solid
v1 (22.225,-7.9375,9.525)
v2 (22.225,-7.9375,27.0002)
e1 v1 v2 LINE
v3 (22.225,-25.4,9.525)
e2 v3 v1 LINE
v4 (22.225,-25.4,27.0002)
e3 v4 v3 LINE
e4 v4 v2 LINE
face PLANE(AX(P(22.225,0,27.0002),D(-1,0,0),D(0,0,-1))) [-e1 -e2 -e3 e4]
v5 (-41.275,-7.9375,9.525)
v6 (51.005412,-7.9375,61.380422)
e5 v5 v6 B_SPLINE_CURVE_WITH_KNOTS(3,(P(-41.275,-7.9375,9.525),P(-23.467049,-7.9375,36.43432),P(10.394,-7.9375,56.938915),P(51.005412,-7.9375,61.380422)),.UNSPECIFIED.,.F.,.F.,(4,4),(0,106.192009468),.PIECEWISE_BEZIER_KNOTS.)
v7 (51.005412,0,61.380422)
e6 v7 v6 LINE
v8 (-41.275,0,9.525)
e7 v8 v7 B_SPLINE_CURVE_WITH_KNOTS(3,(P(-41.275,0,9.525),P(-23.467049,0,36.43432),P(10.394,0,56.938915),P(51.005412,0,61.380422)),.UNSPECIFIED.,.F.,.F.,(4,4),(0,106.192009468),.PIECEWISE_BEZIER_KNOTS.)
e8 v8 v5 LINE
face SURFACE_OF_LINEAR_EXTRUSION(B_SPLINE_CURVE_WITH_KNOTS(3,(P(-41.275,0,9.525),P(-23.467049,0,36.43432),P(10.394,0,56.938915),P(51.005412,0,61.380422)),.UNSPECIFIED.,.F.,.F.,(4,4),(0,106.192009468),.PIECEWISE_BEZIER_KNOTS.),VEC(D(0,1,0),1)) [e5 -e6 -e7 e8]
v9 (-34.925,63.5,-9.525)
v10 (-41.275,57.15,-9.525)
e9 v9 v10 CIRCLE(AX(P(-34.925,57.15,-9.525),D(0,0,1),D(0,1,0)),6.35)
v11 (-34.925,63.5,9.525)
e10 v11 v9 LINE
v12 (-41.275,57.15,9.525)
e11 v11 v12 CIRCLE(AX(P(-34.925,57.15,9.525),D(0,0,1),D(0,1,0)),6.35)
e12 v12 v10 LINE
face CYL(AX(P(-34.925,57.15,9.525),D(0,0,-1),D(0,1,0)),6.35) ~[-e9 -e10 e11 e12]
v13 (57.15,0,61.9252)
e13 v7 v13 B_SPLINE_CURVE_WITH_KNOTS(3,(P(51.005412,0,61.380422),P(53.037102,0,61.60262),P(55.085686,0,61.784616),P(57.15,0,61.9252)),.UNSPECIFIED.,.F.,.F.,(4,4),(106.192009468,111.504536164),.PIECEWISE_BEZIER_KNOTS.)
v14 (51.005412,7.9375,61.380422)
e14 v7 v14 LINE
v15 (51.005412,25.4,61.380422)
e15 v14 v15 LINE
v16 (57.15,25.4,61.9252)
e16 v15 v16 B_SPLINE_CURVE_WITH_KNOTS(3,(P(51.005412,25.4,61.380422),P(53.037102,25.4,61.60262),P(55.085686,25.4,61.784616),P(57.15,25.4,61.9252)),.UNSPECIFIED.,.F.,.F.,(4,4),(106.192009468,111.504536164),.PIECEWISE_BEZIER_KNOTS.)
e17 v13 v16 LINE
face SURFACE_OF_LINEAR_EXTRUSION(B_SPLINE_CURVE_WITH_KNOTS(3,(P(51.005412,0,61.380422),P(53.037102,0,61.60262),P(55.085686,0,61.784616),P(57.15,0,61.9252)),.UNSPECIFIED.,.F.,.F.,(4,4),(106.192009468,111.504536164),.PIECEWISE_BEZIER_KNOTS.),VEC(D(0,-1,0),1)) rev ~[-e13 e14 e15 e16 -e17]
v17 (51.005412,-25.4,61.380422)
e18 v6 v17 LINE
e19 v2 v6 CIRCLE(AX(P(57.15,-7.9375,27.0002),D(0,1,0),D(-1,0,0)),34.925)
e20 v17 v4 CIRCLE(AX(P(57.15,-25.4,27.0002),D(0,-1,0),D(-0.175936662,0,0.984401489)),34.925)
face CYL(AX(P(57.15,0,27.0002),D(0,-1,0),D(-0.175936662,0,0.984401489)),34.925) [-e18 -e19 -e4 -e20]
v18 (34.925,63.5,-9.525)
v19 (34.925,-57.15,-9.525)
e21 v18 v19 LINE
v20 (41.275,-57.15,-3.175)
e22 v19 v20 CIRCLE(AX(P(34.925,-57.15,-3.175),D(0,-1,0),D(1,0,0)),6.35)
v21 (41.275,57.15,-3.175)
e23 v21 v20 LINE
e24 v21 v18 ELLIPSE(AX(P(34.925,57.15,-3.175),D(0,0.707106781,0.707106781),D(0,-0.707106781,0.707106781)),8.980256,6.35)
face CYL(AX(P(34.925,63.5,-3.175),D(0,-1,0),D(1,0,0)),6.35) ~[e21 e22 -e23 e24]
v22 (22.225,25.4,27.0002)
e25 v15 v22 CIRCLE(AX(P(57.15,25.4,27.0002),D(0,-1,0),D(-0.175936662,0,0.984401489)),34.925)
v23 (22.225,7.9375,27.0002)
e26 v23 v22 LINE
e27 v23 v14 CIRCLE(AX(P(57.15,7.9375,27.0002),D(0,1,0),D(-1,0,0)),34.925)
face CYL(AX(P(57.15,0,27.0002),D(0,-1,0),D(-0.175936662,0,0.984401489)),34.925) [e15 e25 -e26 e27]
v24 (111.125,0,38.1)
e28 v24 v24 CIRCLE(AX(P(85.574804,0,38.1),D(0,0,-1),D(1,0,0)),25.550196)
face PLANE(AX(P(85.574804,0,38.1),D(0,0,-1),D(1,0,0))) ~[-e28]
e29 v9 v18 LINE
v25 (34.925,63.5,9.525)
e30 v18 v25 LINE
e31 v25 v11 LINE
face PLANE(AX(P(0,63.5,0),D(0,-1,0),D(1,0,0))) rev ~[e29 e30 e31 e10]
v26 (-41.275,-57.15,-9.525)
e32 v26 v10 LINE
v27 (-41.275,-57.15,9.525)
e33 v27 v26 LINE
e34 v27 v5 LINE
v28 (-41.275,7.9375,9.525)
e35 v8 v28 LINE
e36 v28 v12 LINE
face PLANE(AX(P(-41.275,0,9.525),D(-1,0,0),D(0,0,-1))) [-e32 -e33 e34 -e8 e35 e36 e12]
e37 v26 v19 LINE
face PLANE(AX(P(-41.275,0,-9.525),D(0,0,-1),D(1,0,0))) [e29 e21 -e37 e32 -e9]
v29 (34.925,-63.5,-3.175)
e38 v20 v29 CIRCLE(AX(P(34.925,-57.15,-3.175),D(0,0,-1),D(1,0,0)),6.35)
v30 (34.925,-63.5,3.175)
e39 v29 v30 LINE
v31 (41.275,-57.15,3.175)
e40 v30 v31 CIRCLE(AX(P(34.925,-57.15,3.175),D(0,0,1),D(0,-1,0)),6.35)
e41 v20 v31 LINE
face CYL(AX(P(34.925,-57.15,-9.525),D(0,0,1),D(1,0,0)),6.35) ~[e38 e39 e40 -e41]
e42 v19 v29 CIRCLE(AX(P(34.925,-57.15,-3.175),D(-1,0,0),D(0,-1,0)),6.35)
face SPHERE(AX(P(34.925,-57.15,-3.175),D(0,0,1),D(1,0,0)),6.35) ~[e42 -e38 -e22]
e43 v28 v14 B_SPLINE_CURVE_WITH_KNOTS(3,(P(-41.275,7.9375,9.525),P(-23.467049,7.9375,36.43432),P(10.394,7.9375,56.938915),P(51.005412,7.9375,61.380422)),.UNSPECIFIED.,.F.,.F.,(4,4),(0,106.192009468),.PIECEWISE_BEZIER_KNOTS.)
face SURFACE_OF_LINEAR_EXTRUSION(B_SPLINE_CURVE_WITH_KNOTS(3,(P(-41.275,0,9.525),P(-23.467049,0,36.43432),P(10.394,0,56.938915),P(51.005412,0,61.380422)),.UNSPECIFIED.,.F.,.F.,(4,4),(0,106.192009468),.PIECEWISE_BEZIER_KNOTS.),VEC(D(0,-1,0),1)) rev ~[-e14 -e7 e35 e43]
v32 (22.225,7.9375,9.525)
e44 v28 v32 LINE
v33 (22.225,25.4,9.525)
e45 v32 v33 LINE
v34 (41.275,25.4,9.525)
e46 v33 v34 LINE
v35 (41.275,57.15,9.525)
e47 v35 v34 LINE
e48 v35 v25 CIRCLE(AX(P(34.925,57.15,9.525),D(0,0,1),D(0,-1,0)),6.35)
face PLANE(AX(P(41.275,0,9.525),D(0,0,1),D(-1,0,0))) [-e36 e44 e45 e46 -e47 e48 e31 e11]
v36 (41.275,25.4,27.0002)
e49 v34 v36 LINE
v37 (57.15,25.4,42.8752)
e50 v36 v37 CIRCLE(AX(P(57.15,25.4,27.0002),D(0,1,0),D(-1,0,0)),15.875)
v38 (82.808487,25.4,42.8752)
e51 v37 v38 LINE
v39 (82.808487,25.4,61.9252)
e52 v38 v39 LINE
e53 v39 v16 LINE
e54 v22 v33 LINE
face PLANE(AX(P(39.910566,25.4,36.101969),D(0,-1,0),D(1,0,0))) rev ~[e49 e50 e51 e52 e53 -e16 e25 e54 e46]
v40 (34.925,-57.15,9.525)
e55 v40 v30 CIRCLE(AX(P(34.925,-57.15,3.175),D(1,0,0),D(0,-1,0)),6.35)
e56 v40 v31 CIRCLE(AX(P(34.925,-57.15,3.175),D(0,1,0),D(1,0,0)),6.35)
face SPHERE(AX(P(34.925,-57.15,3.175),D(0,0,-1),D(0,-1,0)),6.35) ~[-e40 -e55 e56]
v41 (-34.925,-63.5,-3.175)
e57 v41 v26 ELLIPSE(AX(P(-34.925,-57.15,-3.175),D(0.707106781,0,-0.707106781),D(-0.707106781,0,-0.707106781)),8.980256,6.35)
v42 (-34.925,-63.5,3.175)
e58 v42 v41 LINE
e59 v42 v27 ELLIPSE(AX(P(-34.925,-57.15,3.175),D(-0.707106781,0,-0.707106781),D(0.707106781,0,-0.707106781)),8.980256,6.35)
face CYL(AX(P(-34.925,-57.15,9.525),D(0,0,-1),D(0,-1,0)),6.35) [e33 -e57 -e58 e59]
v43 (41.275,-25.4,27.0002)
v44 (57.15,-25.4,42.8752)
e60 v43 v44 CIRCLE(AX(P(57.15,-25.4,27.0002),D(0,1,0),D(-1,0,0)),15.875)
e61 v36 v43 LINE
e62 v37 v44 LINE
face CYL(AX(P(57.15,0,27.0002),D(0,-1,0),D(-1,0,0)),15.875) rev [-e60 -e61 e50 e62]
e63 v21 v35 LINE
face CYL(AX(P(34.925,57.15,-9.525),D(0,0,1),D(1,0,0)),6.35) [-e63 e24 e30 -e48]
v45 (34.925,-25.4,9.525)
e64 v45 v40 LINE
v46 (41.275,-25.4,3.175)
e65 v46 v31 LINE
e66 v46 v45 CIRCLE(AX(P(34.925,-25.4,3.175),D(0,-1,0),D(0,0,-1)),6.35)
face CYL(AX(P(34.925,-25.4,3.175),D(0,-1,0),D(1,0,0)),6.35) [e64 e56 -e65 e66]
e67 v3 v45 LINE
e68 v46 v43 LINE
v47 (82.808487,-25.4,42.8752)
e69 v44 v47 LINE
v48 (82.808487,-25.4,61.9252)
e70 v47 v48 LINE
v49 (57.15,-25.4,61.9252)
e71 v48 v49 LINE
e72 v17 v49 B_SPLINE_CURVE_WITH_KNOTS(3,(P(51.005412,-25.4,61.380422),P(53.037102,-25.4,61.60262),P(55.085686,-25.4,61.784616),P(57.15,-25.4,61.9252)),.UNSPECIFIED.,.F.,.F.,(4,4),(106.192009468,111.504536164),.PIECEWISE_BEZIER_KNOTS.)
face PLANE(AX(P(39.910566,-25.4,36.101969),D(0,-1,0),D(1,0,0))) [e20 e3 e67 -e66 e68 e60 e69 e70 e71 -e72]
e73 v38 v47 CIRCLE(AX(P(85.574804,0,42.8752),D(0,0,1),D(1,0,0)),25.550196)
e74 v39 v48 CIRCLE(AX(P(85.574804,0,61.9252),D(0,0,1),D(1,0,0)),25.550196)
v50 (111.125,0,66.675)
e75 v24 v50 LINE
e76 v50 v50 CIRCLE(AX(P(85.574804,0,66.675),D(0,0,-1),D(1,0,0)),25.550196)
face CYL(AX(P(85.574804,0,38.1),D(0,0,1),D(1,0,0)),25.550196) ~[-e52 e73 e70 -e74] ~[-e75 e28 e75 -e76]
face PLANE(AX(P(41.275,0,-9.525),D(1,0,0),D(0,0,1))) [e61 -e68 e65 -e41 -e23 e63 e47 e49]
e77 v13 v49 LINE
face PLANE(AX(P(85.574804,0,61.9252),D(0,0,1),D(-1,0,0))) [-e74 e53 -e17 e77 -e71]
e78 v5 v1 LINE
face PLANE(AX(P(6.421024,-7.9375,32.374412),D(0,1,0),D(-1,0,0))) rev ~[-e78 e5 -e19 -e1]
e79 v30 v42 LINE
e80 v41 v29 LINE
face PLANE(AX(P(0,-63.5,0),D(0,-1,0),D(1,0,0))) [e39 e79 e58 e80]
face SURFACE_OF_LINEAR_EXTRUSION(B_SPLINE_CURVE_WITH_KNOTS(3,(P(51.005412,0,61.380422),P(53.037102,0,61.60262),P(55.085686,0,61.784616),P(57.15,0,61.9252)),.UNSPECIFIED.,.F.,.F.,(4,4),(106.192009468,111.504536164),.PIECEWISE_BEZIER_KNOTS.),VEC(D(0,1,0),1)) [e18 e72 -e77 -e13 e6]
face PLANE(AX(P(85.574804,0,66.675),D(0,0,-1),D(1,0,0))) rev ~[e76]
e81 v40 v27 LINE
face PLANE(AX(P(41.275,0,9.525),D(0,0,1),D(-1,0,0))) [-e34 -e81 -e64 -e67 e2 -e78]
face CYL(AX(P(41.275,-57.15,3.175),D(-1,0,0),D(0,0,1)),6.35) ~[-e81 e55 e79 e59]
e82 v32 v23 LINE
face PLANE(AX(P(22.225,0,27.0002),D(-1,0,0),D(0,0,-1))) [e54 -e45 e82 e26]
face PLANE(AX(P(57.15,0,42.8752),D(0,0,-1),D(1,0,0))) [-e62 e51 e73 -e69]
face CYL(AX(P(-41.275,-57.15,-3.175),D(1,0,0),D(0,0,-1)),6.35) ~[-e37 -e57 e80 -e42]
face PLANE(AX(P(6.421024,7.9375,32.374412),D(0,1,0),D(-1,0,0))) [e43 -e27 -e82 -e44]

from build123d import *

# Parameters (mm, degrees)
F1_DEPTH = 63.5
F2_DEPTH = 7.9375
F0_W     = 25.2498040683
F0_H     = 19.05
F3_DEPTH = 25.4
F5_R     = 6.35


# Not quite as in the source:
# - a feature names something its author has since deleted; it is built from what else it names


with BuildPart() as f1:
    # F0 (on Front) → F1 (new body, symmetric)
    with BuildSketch(Plane.XZ):
        Polygon((-41.275, -9.525), (41.275, -9.525), (41.275, 9.525), (22.225, 9.525), (-41.275, 9.525), align=None)
    extrude(amount=F1_DEPTH, both=True)

    # F0 (on Front) → F2 (join, symmetric)
    with BuildSketch(Plane.XZ):
        with BuildLine():
            add(Edge.make_bspline(
                [(-41.275, 9.525), (-23.4670489943, 36.4343195367), (10.3939996221, 56.9389145817), (51.0054120889, 61.3804219947)],
                knots=[0, 0, 0, 0, 106.1920094682, 106.1920094682, 106.1920094682, 106.1920094682], degree=3))
            Line((-41.275, 9.525), (22.225, 9.525))
            Line((22.225, 9.525), (22.225, 27.0002))
            ThreePointArc((22.225, 27.0002), (30.3698267575, 49.4184502908), (51.0054120889, 61.3804219947))
        make_face()
    extrude(amount=F2_DEPTH, both=True)

    # F0 (on Front) → F3 (join, symmetric)
    with BuildSketch(Plane.XZ):
        with BuildLine():
            Line((22.225, 9.525), (41.275, 9.525))
            Line((41.275, 9.525), (41.275, 27.0002))
            ThreePointArc((41.275, 27.0002), (45.9246798487, 38.2255201513), (57.15, 42.8752))
            Line((57.15, 42.8752), (60.325, 42.8752))
            Line((60.325, 42.8752), (60.325, 61.9252))
            Line((60.325, 61.9252), (57.15, 61.9252))
            add(Edge.make_bspline(
                [(51.0054120889, 61.3804219947), (53.0371017984, 61.6026197553), (55.0856860239, 61.7846155213), (57.15, 61.9252)],
                knots=[106.1920094682, 106.1920094682, 106.1920094682, 106.1920094682, 111.5045361635, 111.5045361635, 111.5045361635, 111.5045361635], degree=3))
            ThreePointArc((51.0054120889, 61.3804219947), (30.3698267575, 49.4184502908), (22.225, 27.0002))
            Line((22.225, 27.0002), (22.225, 9.525))
        make_face()
        with Locations((72.9499020342, 52.4002)):
            Rectangle(F0_W, F0_H)
    extrude(amount=F3_DEPTH, both=True)

    # F0 (on Front) → F4 (revolve)
    with BuildSketch(Plane.XZ):
        Polygon((85.5748040683, 61.9252), (85.5748040683, 42.8752), (85.5748040683, 38.1), (111.125, 38.1), (111.125, 66.675), (85.5748040683, 66.675), align=None)
    revolve(axis=Axis((85.5748040683, 0, 52.3875), (0, 0, -1)))

    # F5
    f5_edges = [f1.edges().sort_by_distance(p)[0] for p in [
        (41.275, -63.5, 0),
        (-41.275, -63.5, 0),
        (0, -63.5, 9.525),
        (41.275, 0, -9.525),
        (0, -63.5, -9.525),
        (41.275, -44.45, 9.525),
        (-41.275, 63.5, 0),
        (41.275, 63.5, 0),
    ]]
    fillet(f5_edges, radius=F5_R)


solid = f1.part
